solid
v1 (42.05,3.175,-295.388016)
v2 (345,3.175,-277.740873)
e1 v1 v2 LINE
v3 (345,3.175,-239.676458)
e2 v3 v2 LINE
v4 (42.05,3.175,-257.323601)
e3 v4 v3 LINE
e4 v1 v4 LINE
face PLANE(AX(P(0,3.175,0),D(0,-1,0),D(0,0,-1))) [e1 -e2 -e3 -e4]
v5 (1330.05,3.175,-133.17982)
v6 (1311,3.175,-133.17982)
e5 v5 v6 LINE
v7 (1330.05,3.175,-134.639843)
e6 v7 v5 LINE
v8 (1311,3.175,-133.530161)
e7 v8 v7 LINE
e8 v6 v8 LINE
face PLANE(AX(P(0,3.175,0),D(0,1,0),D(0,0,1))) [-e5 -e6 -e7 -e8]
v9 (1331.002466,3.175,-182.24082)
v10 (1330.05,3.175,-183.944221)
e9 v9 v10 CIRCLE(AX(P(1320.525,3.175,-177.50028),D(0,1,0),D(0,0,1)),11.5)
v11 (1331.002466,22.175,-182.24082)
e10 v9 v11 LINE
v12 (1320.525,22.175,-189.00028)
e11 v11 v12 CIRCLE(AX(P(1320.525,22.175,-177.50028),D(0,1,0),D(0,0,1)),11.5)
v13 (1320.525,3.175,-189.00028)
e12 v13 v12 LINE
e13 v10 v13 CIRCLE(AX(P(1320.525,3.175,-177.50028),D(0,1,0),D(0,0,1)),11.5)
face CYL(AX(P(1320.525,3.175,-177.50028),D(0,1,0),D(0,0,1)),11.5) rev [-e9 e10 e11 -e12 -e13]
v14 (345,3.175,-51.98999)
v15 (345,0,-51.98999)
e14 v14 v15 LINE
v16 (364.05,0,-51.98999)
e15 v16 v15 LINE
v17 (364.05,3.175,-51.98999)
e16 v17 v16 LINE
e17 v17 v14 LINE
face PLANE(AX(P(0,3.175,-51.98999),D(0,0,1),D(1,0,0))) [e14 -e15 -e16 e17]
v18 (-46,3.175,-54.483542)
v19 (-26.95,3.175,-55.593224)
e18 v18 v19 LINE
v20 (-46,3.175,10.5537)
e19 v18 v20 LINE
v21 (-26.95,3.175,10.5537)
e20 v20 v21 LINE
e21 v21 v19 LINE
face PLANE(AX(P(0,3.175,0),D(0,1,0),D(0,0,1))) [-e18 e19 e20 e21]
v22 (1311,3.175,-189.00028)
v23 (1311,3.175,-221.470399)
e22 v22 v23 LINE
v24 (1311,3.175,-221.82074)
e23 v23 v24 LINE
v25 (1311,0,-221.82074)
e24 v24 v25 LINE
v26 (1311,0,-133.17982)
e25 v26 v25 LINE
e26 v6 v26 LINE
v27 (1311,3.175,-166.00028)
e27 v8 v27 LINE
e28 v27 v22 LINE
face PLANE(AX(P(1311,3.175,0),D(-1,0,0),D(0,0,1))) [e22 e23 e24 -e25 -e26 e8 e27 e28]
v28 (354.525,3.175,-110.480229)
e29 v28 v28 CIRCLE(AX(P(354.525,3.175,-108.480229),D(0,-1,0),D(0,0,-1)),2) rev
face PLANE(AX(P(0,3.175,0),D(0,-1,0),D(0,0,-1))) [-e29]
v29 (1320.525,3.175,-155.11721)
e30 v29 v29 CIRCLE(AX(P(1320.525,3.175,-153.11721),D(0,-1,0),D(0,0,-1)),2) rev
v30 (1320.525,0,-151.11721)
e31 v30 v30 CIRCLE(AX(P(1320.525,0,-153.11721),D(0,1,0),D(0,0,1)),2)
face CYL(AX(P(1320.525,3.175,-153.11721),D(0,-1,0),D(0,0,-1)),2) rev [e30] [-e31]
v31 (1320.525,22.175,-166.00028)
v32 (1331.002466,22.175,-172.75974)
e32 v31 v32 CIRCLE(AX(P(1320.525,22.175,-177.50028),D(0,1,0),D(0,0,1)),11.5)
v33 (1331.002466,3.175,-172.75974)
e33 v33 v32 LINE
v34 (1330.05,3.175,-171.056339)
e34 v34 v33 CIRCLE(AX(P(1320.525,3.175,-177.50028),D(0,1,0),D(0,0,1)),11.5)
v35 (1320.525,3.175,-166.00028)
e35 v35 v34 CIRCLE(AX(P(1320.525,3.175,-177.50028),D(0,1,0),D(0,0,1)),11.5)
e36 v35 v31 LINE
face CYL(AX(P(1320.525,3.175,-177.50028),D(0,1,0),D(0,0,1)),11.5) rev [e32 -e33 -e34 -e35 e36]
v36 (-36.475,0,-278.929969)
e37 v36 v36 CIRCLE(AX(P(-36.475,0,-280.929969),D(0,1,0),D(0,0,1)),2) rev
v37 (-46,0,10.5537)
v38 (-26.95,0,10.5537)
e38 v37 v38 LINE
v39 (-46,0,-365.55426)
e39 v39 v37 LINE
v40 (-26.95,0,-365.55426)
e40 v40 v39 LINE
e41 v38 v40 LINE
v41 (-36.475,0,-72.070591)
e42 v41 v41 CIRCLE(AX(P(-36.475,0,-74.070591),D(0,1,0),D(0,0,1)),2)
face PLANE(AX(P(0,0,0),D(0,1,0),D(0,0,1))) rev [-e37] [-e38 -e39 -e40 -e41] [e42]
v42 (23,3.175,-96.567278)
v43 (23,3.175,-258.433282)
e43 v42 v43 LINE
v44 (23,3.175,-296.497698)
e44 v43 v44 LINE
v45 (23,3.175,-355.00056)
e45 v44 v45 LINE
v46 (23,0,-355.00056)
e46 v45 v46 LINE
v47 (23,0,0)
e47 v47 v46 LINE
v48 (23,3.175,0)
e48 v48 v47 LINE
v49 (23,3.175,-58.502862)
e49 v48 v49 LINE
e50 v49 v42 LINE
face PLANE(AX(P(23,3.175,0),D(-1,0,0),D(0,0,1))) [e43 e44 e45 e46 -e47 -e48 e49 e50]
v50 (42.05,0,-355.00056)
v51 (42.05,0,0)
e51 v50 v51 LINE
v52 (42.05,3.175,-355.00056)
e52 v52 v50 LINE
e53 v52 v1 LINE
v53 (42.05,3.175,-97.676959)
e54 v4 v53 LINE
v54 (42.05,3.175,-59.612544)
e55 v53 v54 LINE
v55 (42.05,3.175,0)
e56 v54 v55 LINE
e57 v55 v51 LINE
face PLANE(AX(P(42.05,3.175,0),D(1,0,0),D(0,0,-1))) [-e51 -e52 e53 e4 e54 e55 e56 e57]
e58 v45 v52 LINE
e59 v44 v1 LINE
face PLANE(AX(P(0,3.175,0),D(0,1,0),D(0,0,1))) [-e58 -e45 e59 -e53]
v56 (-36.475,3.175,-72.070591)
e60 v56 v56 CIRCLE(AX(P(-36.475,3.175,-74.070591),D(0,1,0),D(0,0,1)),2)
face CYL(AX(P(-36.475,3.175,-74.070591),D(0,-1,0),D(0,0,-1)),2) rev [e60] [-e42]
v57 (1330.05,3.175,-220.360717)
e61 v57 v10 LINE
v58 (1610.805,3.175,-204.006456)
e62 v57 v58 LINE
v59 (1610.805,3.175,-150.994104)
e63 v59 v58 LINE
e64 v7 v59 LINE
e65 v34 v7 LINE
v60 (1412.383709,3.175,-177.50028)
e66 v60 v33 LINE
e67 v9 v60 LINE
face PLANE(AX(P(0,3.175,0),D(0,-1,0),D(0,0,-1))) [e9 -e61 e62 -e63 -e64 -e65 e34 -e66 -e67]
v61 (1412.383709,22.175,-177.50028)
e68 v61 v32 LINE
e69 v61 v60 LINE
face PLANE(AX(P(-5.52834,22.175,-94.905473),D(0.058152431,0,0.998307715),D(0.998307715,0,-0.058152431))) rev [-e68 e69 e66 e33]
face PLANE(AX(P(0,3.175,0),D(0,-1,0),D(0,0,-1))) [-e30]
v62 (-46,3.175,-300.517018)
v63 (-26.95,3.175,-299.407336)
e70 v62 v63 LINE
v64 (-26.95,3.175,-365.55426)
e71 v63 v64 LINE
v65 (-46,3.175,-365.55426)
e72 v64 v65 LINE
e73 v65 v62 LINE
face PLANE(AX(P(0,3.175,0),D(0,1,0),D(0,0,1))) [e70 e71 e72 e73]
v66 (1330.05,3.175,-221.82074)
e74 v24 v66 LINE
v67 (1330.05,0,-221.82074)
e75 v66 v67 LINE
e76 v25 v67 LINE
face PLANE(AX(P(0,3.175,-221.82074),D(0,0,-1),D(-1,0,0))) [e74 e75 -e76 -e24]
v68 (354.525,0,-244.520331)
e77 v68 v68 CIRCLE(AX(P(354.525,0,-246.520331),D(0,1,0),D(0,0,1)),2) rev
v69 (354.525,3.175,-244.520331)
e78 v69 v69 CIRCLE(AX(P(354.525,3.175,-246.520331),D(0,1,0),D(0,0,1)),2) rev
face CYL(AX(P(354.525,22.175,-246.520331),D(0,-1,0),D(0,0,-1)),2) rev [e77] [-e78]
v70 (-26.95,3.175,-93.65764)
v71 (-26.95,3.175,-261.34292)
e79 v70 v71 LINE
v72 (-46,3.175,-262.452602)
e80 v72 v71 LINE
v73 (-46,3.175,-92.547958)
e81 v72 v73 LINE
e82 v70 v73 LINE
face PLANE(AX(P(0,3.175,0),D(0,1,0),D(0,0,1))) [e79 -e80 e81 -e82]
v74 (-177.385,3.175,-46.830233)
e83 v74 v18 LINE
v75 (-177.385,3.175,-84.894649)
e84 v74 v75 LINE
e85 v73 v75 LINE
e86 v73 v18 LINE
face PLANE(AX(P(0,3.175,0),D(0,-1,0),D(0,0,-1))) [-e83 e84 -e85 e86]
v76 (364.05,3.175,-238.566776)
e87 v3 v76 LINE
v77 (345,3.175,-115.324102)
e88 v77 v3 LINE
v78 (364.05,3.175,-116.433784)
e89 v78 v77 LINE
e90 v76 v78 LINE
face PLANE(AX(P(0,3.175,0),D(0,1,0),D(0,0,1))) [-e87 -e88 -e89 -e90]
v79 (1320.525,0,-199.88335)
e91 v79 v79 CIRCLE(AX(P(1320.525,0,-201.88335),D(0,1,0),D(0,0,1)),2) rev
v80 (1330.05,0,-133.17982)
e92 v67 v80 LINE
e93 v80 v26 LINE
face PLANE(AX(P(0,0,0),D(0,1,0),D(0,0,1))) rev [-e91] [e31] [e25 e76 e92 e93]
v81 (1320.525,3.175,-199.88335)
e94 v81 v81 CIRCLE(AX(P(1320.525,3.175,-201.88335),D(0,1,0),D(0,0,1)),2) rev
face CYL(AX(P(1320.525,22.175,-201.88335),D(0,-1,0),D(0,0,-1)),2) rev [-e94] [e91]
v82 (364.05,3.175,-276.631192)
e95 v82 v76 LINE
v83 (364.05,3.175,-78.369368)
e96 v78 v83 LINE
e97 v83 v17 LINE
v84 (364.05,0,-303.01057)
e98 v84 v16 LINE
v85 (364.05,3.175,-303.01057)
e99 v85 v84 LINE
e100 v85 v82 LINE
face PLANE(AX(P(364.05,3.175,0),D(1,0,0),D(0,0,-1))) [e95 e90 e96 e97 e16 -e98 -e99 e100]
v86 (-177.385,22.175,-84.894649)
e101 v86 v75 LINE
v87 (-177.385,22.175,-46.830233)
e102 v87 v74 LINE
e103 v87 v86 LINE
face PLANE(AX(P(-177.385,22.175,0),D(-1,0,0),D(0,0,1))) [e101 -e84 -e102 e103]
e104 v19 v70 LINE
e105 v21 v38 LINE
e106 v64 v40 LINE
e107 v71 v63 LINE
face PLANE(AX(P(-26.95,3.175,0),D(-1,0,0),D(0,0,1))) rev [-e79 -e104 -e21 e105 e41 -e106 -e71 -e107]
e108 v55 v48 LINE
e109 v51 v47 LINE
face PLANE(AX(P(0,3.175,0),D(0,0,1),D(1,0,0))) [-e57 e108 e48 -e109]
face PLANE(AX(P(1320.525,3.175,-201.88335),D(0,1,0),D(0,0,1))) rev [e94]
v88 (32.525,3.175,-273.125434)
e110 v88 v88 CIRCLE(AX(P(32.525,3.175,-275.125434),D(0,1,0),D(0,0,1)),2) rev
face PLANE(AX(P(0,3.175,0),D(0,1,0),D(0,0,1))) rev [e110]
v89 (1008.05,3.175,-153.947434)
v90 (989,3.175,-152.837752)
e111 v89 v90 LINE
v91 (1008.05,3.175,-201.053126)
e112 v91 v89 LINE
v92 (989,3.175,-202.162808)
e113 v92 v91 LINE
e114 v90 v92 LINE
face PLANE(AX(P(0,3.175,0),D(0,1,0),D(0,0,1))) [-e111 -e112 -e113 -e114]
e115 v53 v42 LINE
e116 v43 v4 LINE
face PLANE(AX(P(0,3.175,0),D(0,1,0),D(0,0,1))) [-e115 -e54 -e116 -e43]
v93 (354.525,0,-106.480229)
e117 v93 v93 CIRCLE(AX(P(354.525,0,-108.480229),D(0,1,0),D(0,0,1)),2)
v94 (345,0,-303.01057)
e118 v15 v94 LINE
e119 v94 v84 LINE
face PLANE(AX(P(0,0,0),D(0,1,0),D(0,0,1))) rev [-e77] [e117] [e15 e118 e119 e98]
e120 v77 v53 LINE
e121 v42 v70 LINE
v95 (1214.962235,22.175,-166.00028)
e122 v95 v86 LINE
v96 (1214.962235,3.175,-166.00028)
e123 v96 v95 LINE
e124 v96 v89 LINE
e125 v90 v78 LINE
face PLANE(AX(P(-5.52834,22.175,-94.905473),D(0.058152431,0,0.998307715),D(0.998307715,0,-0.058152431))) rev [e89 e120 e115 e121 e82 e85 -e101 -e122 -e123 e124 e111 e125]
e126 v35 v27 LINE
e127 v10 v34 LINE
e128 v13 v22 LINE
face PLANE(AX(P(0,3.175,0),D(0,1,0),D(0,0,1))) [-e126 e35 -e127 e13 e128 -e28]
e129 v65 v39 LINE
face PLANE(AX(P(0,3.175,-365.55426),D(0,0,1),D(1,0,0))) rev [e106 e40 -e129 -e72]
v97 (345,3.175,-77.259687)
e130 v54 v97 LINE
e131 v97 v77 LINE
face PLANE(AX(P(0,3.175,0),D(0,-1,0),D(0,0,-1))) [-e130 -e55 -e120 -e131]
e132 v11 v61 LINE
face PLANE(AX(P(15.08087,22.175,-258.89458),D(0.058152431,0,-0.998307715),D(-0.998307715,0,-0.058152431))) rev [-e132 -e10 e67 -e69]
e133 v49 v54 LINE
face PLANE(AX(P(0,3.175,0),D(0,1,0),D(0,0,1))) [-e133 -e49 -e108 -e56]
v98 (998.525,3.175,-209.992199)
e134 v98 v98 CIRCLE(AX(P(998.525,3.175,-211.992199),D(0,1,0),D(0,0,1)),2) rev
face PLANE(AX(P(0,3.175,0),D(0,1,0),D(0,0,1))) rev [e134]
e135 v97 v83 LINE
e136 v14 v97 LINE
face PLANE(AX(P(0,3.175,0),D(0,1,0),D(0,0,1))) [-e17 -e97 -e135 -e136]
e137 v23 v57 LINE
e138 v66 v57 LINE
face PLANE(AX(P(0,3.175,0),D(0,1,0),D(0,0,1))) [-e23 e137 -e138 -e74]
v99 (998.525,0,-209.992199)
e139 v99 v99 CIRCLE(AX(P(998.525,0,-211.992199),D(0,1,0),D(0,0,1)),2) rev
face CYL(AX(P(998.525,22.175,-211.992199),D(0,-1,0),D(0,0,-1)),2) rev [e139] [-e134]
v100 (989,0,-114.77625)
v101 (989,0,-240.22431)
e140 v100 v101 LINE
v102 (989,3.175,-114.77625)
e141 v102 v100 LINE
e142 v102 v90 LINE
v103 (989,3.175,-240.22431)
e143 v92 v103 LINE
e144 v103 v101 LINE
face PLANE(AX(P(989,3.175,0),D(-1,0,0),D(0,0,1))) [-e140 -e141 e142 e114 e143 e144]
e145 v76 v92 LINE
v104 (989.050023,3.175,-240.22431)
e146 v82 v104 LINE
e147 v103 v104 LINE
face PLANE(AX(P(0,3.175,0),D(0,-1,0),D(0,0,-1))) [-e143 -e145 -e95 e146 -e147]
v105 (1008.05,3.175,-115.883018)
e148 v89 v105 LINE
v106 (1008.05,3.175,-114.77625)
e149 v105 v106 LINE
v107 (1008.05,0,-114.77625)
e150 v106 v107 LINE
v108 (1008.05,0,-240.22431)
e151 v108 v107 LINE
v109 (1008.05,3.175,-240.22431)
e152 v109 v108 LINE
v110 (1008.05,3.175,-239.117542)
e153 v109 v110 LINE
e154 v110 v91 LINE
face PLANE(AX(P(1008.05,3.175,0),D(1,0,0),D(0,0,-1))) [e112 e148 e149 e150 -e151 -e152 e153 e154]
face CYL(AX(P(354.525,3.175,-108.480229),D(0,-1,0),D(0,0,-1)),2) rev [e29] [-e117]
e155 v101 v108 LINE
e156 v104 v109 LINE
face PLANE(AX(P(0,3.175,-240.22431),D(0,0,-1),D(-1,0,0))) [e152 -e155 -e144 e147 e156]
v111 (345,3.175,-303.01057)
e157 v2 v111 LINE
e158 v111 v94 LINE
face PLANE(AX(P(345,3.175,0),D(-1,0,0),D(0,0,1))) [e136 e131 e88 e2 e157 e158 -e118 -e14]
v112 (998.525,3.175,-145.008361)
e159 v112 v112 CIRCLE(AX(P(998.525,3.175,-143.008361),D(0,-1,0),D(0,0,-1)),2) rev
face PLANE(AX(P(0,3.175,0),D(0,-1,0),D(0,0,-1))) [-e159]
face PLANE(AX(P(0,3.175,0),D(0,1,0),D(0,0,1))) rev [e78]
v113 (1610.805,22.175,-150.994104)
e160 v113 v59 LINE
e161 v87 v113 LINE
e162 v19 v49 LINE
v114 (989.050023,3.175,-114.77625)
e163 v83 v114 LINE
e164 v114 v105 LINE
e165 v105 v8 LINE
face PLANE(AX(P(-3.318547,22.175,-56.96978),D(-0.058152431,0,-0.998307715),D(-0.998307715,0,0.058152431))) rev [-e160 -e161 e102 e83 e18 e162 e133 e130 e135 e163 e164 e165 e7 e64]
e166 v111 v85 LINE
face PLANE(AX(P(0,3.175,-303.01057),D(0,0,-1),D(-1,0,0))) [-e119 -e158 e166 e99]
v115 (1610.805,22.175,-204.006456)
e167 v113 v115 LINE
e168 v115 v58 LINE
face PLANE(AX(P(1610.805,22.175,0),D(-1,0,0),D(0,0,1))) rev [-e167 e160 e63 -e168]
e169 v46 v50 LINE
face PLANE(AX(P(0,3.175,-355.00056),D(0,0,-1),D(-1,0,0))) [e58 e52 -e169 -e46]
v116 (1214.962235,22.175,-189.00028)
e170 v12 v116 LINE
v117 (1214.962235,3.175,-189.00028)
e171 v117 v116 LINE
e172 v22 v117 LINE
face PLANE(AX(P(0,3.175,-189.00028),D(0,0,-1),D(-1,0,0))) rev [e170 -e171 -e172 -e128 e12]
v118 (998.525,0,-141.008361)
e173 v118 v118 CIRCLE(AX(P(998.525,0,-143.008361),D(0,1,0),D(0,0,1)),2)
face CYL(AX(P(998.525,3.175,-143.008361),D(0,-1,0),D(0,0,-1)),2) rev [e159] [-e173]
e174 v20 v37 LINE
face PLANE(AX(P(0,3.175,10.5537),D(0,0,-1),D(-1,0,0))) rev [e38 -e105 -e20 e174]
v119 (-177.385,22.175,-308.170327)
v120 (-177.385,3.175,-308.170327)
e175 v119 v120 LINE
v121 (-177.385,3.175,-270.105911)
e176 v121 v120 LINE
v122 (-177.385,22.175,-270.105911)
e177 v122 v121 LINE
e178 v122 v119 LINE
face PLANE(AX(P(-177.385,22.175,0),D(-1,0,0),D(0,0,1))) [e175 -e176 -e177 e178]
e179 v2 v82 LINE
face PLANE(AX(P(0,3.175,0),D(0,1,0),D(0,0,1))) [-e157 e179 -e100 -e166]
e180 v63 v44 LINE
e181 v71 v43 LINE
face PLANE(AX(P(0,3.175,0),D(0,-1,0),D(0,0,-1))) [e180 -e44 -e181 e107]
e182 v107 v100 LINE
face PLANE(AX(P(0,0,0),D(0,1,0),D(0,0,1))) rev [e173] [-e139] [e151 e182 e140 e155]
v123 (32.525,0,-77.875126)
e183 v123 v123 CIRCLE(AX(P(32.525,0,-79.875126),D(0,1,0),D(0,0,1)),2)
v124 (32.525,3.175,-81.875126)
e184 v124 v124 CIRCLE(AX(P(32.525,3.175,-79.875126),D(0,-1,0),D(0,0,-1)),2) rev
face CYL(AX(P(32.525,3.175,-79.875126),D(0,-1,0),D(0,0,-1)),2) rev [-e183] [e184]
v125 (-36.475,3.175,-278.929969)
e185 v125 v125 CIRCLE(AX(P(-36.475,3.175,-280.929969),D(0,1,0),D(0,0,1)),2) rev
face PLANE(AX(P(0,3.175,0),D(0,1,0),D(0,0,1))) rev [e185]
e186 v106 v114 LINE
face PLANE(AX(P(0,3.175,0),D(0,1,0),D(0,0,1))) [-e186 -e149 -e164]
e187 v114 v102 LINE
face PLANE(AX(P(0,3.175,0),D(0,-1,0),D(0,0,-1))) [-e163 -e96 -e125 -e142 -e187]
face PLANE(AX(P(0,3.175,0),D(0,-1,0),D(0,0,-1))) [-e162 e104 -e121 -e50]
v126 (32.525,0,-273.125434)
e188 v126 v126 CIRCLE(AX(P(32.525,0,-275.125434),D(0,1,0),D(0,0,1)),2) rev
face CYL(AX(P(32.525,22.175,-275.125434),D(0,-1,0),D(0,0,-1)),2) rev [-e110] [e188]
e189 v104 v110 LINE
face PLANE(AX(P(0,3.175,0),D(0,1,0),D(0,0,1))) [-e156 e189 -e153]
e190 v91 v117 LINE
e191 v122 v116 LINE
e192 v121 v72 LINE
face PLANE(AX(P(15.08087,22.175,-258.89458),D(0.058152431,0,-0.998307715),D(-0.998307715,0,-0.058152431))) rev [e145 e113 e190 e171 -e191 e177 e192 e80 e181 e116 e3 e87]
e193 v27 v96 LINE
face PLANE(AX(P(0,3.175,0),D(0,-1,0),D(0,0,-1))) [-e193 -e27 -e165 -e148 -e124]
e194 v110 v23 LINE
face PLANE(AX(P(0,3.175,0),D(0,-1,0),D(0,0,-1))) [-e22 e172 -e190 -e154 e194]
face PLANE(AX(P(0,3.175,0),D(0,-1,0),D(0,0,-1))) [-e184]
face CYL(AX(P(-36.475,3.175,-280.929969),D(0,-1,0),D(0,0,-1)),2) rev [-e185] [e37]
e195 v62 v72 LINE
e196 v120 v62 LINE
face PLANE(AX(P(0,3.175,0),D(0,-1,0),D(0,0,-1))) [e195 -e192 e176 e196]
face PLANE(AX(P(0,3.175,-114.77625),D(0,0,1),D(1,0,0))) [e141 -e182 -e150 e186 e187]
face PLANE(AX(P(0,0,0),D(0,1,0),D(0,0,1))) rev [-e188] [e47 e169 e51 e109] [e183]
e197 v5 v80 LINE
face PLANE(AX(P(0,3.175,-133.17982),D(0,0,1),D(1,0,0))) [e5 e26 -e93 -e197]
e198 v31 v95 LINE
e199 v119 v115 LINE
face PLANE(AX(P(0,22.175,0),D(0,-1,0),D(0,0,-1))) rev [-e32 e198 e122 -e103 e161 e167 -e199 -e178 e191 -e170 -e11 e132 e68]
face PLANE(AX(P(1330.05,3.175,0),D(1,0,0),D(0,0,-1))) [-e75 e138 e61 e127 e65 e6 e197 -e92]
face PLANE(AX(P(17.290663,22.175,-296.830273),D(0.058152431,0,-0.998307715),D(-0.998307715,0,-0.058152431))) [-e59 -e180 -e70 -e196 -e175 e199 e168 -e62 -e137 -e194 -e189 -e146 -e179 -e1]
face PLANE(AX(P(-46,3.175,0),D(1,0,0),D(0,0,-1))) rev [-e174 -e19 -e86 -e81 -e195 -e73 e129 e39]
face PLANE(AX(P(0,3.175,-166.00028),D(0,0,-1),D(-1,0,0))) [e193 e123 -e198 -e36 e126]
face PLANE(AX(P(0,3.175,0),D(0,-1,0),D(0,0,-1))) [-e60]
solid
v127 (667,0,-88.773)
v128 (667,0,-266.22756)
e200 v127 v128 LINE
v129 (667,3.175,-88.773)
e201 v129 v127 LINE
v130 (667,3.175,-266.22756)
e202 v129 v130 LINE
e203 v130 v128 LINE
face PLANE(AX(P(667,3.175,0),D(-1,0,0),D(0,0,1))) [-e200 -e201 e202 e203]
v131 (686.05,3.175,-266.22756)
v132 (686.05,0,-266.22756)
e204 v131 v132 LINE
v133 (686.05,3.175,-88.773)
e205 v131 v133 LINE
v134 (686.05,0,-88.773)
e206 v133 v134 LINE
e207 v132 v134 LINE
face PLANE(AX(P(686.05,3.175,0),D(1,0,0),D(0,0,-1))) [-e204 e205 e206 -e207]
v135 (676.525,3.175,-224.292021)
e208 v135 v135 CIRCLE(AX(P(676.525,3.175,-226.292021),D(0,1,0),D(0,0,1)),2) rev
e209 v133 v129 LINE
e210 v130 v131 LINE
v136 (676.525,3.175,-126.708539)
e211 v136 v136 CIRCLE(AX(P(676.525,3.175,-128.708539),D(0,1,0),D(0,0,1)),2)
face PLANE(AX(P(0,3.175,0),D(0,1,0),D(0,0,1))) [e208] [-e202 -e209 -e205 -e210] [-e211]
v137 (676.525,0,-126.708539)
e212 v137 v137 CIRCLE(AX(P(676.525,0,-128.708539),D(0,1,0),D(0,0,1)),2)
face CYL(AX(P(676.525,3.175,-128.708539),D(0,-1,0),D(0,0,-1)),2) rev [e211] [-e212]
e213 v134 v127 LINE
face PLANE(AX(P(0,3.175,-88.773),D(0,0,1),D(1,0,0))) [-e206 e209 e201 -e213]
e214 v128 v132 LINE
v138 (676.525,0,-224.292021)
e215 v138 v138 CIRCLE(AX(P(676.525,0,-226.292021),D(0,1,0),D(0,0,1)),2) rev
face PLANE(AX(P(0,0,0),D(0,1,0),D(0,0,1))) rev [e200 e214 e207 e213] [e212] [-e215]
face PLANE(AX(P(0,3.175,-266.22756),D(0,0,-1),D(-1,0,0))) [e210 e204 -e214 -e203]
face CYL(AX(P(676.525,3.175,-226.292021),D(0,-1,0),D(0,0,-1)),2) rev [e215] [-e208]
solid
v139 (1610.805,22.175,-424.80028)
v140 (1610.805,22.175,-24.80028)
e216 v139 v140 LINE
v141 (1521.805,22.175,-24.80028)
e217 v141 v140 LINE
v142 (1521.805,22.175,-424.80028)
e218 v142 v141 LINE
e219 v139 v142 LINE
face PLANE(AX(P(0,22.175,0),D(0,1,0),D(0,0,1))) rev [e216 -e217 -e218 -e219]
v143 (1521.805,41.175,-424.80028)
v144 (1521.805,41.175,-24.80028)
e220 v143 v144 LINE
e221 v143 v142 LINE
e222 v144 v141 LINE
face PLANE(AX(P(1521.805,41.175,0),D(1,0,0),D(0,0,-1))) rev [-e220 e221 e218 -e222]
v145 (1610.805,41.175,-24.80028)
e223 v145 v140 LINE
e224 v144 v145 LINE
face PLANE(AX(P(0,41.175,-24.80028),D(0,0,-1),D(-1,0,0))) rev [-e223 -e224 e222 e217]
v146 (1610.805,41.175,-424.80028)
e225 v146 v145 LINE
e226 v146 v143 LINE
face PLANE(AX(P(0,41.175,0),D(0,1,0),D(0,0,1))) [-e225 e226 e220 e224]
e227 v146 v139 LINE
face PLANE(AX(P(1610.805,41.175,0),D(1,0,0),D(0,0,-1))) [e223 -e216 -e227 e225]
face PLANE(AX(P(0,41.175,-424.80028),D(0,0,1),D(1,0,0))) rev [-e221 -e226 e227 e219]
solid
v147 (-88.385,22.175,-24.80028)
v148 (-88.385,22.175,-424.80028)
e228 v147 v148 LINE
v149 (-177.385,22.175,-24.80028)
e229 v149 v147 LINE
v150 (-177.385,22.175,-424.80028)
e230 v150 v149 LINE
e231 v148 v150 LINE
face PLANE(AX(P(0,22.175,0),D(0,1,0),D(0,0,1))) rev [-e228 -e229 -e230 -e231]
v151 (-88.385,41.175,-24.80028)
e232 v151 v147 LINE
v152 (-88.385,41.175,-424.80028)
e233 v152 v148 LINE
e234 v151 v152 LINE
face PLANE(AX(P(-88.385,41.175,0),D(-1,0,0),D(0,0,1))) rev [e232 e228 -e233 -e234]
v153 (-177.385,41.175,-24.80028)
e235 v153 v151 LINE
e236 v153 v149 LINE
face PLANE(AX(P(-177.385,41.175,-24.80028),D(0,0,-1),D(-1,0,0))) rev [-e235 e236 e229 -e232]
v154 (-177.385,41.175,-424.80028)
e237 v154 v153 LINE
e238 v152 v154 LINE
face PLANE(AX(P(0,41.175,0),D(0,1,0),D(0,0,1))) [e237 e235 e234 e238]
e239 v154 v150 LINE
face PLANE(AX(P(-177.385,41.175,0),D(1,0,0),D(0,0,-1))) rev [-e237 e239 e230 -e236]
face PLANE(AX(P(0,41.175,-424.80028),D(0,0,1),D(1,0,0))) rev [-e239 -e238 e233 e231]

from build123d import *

# Parameters (mm, degrees)
SKETCH2_W             = 19.05
SKETCH2_H             = 355.00056
SKETCH2_R             = 2
BOSS_EXTRUDE1_DEPTH   = 3.175
SKETCH2_H_2           = 251.02058
BOSS_EXTRUDE1_2_DEPTH = 3.175
SKETCH2_H_3           = 177.45456
BOSS_EXTRUDE1_3_DEPTH = 3.175
SKETCH2_H_4           = 125.44806
BOSS_EXTRUDE1_4_DEPTH = 3.175
SKETCH2_H_5           = 88.64092
BOSS_EXTRUDE1_5_DEPTH = 3.175
SKETCH2_H_6           = 376.10796
BOSS_EXTRUDE1_6_DEPTH = 3.175
SKETCH3_W             = 1788.19
SKETCH3_H             = 140
BOSS_EXTRUDE2_DEPTH   = 19
BOSS_EXTRUDE2_2_DEPTH = 19
SKETCH4_R             = 2
BOSS_EXTRUDE3_DEPTH   = 19
SKETCH5_W             = 89
SKETCH5_H             = 400
BOSS_EXTRUDE4_DEPTH   = 19
BOSS_EXTRUDE4_2_DEPTH = 19
BOSS_EXTRUDE5_START   = -19
SKETCH6_R             = 2
BOSS_EXTRUDE5_DEPTH   = 19
CUT_EXTRUDE1_DEPTH    = 19


with BuildPart() as part:
    # Sketch2 → Boss-Extrude1 (new body)
    with BuildSketch(Plane(origin=(0, 0, 0), x_dir=(1, 0, 0), z_dir=(0, 1, 0))):
        with Locations((32.525, 177.50028)):
            Rectangle(SKETCH2_W, SKETCH2_H)
        with Locations((32.525, 79.875126)):
            Circle(SKETCH2_R, mode=Mode.SUBTRACT)
        with Locations((32.525, 275.125434)):
            Circle(SKETCH2_R, mode=Mode.SUBTRACT)
    extrude(amount=BOSS_EXTRUDE1_DEPTH)



with BuildPart() as body_2:
    # Sketch2 → Boss-Extrude1 2 (new body)
    with BuildSketch(Plane(origin=(0, 0, 0), x_dir=(1, 0, 0), z_dir=(0, 1, 0))):
        with Locations((354.525, 177.50028)):
            Rectangle(SKETCH2_W, SKETCH2_H_2)
        with Locations((354.525, 108.48022915)):
            Circle(SKETCH2_R, mode=Mode.SUBTRACT)
        with Locations((354.525, 246.52033085)):
            Circle(SKETCH2_R, mode=Mode.SUBTRACT)
    extrude(amount=BOSS_EXTRUDE1_2_DEPTH)


with BuildPart() as body_3:
    # Sketch2 → Boss-Extrude1 3 (new body)
    with BuildSketch(Plane(origin=(0, 0, 0), x_dir=(1, 0, 0), z_dir=(0, 1, 0))):
        with Locations((676.525, 177.50028)):
            Rectangle(SKETCH2_W, SKETCH2_H_3)
        with Locations((676.525, 128.708539125)):
            Circle(SKETCH2_R, mode=Mode.SUBTRACT)
        with Locations((676.525, 226.292020875)):
            Circle(SKETCH2_R, mode=Mode.SUBTRACT)
    extrude(amount=BOSS_EXTRUDE1_3_DEPTH)


with BuildPart() as body_4:
    # Sketch2 → Boss-Extrude1 4 (new body)
    with BuildSketch(Plane(origin=(0, 0, 0), x_dir=(1, 0, 0), z_dir=(0, 1, 0))):
        with Locations((998.525, 177.50028)):
            Rectangle(SKETCH2_W, SKETCH2_H_4)
        with Locations((998.525, 143.008361365)):
            Circle(SKETCH2_R, mode=Mode.SUBTRACT)
        with Locations((998.525, 211.992198635)):
            Circle(SKETCH2_R, mode=Mode.SUBTRACT)
    extrude(amount=BOSS_EXTRUDE1_4_DEPTH)


with BuildPart() as body_5:
    # Sketch2 → Boss-Extrude1 5 (new body)
    with BuildSketch(Plane(origin=(0, 0, 0), x_dir=(1, 0, 0), z_dir=(0, 1, 0))):
        with Locations((1320.525, 177.50028)):
            Rectangle(SKETCH2_W, SKETCH2_H_5)
        with Locations((1320.525, 153.11720963)):
            Circle(SKETCH2_R, mode=Mode.SUBTRACT)
        with Locations((1320.525, 201.88335037)):
            Circle(SKETCH2_R, mode=Mode.SUBTRACT)
    extrude(amount=BOSS_EXTRUDE1_5_DEPTH)


with BuildPart() as body_6:
    # Sketch2 → Boss-Extrude1 6 (new body)
    with BuildSketch(Plane(origin=(0, 0, 0), x_dir=(1, 0, 0), z_dir=(0, 1, 0))):
        with Locations((-36.475, 177.50028)):
            Rectangle(SKETCH2_W, SKETCH2_H_6)
        with Locations((-36.475, 74.070591)):
            Circle(SKETCH2_R, mode=Mode.SUBTRACT)
        with Locations((-36.475, 280.929969)):
            Circle(SKETCH2_R, mode=Mode.SUBTRACT)
    extrude(amount=BOSS_EXTRUDE1_6_DEPTH)


with BuildPart() as body_7:
    # Sketch3 → Boss-Extrude2 (new body)
    with BuildSketch(Plane(origin=(0, 3.175, 0), x_dir=(1, 0, 0), z_dir=(0, 1, 0))):
        with Locations((716.71, 260.20028)):
            Rectangle(SKETCH3_W, SKETCH3_H)
    extrude(amount=BOSS_EXTRUDE2_DEPTH)


with BuildPart() as body_8:
    # Sketch3 → Boss-Extrude2 2 (new body)
    with BuildSketch(Plane(origin=(0, 3.175, 0), x_dir=(1, 0, 0), z_dir=(0, 1, 0))):
        with Locations((716.71, 94.80028)):
            Rectangle(SKETCH3_W, SKETCH3_H)
    extrude(amount=BOSS_EXTRUDE2_2_DEPTH)


with BuildPart() as body_9:
    # Sketch4 → Boss-Extrude3 (new body)
    with BuildSketch(Plane.XZ.offset(-3.175)):
        Polygon((-177.385, -270.105910706), (-177.385, -308.170326529), (1610.805, -204.006455514), (1610.805, -150.994104486), (-177.385, -46.830233471), (-177.385, -84.894649294), (1412.383709231, -177.50028), align=None)
        with Locations((-36.475, -280.929969)):
            Circle(SKETCH4_R, mode=Mode.SUBTRACT)
        with BuildLine():
            ThreePointArc((33.534728126, -276.851831727), (32.641304863, -277.122049431), (31.722549739, -276.957392946))
            ThreePointArc((31.722549739, -276.957392946), (32.408695137, -273.128818569), (33.534728126, -276.851831727))
        make_face(mode=Mode.SUBTRACT)
        with Locations((354.525, -246.52033085)):
            Circle(SKETCH4_R, mode=Mode.SUBTRACT)
        with Locations((998.525, -211.992198635)):
            Circle(SKETCH4_R, mode=Mode.SUBTRACT)
        with Locations((1320.525, -201.88335037)):
            Circle(SKETCH4_R, mode=Mode.SUBTRACT)
    extrude(amount=-BOSS_EXTRUDE3_DEPTH)


with BuildPart() as body_10:
    # Sketch5 → Boss-Extrude4 (new body)
    with BuildSketch(Plane(origin=(0, 22.175, 0), x_dir=(1, 0, 0), z_dir=(0, 1, 0))):
        with Locations((1566.305, 224.80028)):
            Rectangle(SKETCH5_W, SKETCH5_H)
    extrude(amount=BOSS_EXTRUDE4_DEPTH)


with BuildPart() as body_11:
    # Sketch5 → Boss-Extrude4 2 (new body)
    with BuildSketch(Plane(origin=(0, 22.175, 0), x_dir=(1, 0, 0), z_dir=(0, 1, 0))):
        with Locations((-132.885, 224.80028)):
            Rectangle(SKETCH5_W, SKETCH5_H)
    extrude(amount=BOSS_EXTRUDE4_2_DEPTH)


with BuildPart() as part_1:
    add(part.part)

    add(body_2.part)  # Boss-Extrude5 merges body 2

    add(body_4.part)  # Boss-Extrude5 merges body 4

    add(body_5.part)  # Boss-Extrude5 merges body 5

    add(body_6.part)  # Boss-Extrude5 merges body 6

    add(body_9.part)  # Boss-Extrude5 merges body 9
    # Sketch6 → Boss-Extrude5 (add)
    with BuildSketch(Plane(origin=(0, 22.175, 0), x_dir=(1, 0, 0), z_dir=(0, 1, 0)).offset(BOSS_EXTRUDE5_START)):
        with Locations((-36.475, 280.929969)):
            Circle(SKETCH6_R)
        with Locations((354.525, 246.52033085)):
            Circle(SKETCH6_R)
        with Locations((998.525, 211.992198635)):
            Circle(SKETCH6_R)
        with Locations((1320.525, 201.88335037)):
            Circle(SKETCH6_R)
        with Locations((32.525, 275.125434)):
            Circle(SKETCH6_R)
    extrude(amount=BOSS_EXTRUDE5_DEPTH)

    # Sketch7 → Cut-Extrude1 (cut)
    with BuildSketch(Plane(origin=(0, 22.175, 0), x_dir=(1, 0, 0), z_dir=(0, 1, 0))):
        with BuildLine():
            Line((1214.962234784, 166.00028), (1320.525, 166.00028))
            ThreePointArc((1320.525, 166.00028), (1326.759332182, 167.836786727), (1331.002465583, 172.759740479))
            Line((1331.002465583, 172.759740479), (1214.962234784, 166.00028))
        make_face()
        with BuildLine():
            ThreePointArc((1331.002465583, 182.240819521), (1326.759332182, 187.163773273), (1320.525, 189.00028))
            Line((1320.525, 189.00028), (1214.962234784, 189.00028))
            Line((1214.962234784, 189.00028), (1331.002465583, 182.240819521))
        make_face()
    extrude(amount=-CUT_EXTRUDE1_DEPTH, mode=Mode.SUBTRACT)


solid = Compound([body_3.part, body_10.part, body_11.part, part_1.part])
